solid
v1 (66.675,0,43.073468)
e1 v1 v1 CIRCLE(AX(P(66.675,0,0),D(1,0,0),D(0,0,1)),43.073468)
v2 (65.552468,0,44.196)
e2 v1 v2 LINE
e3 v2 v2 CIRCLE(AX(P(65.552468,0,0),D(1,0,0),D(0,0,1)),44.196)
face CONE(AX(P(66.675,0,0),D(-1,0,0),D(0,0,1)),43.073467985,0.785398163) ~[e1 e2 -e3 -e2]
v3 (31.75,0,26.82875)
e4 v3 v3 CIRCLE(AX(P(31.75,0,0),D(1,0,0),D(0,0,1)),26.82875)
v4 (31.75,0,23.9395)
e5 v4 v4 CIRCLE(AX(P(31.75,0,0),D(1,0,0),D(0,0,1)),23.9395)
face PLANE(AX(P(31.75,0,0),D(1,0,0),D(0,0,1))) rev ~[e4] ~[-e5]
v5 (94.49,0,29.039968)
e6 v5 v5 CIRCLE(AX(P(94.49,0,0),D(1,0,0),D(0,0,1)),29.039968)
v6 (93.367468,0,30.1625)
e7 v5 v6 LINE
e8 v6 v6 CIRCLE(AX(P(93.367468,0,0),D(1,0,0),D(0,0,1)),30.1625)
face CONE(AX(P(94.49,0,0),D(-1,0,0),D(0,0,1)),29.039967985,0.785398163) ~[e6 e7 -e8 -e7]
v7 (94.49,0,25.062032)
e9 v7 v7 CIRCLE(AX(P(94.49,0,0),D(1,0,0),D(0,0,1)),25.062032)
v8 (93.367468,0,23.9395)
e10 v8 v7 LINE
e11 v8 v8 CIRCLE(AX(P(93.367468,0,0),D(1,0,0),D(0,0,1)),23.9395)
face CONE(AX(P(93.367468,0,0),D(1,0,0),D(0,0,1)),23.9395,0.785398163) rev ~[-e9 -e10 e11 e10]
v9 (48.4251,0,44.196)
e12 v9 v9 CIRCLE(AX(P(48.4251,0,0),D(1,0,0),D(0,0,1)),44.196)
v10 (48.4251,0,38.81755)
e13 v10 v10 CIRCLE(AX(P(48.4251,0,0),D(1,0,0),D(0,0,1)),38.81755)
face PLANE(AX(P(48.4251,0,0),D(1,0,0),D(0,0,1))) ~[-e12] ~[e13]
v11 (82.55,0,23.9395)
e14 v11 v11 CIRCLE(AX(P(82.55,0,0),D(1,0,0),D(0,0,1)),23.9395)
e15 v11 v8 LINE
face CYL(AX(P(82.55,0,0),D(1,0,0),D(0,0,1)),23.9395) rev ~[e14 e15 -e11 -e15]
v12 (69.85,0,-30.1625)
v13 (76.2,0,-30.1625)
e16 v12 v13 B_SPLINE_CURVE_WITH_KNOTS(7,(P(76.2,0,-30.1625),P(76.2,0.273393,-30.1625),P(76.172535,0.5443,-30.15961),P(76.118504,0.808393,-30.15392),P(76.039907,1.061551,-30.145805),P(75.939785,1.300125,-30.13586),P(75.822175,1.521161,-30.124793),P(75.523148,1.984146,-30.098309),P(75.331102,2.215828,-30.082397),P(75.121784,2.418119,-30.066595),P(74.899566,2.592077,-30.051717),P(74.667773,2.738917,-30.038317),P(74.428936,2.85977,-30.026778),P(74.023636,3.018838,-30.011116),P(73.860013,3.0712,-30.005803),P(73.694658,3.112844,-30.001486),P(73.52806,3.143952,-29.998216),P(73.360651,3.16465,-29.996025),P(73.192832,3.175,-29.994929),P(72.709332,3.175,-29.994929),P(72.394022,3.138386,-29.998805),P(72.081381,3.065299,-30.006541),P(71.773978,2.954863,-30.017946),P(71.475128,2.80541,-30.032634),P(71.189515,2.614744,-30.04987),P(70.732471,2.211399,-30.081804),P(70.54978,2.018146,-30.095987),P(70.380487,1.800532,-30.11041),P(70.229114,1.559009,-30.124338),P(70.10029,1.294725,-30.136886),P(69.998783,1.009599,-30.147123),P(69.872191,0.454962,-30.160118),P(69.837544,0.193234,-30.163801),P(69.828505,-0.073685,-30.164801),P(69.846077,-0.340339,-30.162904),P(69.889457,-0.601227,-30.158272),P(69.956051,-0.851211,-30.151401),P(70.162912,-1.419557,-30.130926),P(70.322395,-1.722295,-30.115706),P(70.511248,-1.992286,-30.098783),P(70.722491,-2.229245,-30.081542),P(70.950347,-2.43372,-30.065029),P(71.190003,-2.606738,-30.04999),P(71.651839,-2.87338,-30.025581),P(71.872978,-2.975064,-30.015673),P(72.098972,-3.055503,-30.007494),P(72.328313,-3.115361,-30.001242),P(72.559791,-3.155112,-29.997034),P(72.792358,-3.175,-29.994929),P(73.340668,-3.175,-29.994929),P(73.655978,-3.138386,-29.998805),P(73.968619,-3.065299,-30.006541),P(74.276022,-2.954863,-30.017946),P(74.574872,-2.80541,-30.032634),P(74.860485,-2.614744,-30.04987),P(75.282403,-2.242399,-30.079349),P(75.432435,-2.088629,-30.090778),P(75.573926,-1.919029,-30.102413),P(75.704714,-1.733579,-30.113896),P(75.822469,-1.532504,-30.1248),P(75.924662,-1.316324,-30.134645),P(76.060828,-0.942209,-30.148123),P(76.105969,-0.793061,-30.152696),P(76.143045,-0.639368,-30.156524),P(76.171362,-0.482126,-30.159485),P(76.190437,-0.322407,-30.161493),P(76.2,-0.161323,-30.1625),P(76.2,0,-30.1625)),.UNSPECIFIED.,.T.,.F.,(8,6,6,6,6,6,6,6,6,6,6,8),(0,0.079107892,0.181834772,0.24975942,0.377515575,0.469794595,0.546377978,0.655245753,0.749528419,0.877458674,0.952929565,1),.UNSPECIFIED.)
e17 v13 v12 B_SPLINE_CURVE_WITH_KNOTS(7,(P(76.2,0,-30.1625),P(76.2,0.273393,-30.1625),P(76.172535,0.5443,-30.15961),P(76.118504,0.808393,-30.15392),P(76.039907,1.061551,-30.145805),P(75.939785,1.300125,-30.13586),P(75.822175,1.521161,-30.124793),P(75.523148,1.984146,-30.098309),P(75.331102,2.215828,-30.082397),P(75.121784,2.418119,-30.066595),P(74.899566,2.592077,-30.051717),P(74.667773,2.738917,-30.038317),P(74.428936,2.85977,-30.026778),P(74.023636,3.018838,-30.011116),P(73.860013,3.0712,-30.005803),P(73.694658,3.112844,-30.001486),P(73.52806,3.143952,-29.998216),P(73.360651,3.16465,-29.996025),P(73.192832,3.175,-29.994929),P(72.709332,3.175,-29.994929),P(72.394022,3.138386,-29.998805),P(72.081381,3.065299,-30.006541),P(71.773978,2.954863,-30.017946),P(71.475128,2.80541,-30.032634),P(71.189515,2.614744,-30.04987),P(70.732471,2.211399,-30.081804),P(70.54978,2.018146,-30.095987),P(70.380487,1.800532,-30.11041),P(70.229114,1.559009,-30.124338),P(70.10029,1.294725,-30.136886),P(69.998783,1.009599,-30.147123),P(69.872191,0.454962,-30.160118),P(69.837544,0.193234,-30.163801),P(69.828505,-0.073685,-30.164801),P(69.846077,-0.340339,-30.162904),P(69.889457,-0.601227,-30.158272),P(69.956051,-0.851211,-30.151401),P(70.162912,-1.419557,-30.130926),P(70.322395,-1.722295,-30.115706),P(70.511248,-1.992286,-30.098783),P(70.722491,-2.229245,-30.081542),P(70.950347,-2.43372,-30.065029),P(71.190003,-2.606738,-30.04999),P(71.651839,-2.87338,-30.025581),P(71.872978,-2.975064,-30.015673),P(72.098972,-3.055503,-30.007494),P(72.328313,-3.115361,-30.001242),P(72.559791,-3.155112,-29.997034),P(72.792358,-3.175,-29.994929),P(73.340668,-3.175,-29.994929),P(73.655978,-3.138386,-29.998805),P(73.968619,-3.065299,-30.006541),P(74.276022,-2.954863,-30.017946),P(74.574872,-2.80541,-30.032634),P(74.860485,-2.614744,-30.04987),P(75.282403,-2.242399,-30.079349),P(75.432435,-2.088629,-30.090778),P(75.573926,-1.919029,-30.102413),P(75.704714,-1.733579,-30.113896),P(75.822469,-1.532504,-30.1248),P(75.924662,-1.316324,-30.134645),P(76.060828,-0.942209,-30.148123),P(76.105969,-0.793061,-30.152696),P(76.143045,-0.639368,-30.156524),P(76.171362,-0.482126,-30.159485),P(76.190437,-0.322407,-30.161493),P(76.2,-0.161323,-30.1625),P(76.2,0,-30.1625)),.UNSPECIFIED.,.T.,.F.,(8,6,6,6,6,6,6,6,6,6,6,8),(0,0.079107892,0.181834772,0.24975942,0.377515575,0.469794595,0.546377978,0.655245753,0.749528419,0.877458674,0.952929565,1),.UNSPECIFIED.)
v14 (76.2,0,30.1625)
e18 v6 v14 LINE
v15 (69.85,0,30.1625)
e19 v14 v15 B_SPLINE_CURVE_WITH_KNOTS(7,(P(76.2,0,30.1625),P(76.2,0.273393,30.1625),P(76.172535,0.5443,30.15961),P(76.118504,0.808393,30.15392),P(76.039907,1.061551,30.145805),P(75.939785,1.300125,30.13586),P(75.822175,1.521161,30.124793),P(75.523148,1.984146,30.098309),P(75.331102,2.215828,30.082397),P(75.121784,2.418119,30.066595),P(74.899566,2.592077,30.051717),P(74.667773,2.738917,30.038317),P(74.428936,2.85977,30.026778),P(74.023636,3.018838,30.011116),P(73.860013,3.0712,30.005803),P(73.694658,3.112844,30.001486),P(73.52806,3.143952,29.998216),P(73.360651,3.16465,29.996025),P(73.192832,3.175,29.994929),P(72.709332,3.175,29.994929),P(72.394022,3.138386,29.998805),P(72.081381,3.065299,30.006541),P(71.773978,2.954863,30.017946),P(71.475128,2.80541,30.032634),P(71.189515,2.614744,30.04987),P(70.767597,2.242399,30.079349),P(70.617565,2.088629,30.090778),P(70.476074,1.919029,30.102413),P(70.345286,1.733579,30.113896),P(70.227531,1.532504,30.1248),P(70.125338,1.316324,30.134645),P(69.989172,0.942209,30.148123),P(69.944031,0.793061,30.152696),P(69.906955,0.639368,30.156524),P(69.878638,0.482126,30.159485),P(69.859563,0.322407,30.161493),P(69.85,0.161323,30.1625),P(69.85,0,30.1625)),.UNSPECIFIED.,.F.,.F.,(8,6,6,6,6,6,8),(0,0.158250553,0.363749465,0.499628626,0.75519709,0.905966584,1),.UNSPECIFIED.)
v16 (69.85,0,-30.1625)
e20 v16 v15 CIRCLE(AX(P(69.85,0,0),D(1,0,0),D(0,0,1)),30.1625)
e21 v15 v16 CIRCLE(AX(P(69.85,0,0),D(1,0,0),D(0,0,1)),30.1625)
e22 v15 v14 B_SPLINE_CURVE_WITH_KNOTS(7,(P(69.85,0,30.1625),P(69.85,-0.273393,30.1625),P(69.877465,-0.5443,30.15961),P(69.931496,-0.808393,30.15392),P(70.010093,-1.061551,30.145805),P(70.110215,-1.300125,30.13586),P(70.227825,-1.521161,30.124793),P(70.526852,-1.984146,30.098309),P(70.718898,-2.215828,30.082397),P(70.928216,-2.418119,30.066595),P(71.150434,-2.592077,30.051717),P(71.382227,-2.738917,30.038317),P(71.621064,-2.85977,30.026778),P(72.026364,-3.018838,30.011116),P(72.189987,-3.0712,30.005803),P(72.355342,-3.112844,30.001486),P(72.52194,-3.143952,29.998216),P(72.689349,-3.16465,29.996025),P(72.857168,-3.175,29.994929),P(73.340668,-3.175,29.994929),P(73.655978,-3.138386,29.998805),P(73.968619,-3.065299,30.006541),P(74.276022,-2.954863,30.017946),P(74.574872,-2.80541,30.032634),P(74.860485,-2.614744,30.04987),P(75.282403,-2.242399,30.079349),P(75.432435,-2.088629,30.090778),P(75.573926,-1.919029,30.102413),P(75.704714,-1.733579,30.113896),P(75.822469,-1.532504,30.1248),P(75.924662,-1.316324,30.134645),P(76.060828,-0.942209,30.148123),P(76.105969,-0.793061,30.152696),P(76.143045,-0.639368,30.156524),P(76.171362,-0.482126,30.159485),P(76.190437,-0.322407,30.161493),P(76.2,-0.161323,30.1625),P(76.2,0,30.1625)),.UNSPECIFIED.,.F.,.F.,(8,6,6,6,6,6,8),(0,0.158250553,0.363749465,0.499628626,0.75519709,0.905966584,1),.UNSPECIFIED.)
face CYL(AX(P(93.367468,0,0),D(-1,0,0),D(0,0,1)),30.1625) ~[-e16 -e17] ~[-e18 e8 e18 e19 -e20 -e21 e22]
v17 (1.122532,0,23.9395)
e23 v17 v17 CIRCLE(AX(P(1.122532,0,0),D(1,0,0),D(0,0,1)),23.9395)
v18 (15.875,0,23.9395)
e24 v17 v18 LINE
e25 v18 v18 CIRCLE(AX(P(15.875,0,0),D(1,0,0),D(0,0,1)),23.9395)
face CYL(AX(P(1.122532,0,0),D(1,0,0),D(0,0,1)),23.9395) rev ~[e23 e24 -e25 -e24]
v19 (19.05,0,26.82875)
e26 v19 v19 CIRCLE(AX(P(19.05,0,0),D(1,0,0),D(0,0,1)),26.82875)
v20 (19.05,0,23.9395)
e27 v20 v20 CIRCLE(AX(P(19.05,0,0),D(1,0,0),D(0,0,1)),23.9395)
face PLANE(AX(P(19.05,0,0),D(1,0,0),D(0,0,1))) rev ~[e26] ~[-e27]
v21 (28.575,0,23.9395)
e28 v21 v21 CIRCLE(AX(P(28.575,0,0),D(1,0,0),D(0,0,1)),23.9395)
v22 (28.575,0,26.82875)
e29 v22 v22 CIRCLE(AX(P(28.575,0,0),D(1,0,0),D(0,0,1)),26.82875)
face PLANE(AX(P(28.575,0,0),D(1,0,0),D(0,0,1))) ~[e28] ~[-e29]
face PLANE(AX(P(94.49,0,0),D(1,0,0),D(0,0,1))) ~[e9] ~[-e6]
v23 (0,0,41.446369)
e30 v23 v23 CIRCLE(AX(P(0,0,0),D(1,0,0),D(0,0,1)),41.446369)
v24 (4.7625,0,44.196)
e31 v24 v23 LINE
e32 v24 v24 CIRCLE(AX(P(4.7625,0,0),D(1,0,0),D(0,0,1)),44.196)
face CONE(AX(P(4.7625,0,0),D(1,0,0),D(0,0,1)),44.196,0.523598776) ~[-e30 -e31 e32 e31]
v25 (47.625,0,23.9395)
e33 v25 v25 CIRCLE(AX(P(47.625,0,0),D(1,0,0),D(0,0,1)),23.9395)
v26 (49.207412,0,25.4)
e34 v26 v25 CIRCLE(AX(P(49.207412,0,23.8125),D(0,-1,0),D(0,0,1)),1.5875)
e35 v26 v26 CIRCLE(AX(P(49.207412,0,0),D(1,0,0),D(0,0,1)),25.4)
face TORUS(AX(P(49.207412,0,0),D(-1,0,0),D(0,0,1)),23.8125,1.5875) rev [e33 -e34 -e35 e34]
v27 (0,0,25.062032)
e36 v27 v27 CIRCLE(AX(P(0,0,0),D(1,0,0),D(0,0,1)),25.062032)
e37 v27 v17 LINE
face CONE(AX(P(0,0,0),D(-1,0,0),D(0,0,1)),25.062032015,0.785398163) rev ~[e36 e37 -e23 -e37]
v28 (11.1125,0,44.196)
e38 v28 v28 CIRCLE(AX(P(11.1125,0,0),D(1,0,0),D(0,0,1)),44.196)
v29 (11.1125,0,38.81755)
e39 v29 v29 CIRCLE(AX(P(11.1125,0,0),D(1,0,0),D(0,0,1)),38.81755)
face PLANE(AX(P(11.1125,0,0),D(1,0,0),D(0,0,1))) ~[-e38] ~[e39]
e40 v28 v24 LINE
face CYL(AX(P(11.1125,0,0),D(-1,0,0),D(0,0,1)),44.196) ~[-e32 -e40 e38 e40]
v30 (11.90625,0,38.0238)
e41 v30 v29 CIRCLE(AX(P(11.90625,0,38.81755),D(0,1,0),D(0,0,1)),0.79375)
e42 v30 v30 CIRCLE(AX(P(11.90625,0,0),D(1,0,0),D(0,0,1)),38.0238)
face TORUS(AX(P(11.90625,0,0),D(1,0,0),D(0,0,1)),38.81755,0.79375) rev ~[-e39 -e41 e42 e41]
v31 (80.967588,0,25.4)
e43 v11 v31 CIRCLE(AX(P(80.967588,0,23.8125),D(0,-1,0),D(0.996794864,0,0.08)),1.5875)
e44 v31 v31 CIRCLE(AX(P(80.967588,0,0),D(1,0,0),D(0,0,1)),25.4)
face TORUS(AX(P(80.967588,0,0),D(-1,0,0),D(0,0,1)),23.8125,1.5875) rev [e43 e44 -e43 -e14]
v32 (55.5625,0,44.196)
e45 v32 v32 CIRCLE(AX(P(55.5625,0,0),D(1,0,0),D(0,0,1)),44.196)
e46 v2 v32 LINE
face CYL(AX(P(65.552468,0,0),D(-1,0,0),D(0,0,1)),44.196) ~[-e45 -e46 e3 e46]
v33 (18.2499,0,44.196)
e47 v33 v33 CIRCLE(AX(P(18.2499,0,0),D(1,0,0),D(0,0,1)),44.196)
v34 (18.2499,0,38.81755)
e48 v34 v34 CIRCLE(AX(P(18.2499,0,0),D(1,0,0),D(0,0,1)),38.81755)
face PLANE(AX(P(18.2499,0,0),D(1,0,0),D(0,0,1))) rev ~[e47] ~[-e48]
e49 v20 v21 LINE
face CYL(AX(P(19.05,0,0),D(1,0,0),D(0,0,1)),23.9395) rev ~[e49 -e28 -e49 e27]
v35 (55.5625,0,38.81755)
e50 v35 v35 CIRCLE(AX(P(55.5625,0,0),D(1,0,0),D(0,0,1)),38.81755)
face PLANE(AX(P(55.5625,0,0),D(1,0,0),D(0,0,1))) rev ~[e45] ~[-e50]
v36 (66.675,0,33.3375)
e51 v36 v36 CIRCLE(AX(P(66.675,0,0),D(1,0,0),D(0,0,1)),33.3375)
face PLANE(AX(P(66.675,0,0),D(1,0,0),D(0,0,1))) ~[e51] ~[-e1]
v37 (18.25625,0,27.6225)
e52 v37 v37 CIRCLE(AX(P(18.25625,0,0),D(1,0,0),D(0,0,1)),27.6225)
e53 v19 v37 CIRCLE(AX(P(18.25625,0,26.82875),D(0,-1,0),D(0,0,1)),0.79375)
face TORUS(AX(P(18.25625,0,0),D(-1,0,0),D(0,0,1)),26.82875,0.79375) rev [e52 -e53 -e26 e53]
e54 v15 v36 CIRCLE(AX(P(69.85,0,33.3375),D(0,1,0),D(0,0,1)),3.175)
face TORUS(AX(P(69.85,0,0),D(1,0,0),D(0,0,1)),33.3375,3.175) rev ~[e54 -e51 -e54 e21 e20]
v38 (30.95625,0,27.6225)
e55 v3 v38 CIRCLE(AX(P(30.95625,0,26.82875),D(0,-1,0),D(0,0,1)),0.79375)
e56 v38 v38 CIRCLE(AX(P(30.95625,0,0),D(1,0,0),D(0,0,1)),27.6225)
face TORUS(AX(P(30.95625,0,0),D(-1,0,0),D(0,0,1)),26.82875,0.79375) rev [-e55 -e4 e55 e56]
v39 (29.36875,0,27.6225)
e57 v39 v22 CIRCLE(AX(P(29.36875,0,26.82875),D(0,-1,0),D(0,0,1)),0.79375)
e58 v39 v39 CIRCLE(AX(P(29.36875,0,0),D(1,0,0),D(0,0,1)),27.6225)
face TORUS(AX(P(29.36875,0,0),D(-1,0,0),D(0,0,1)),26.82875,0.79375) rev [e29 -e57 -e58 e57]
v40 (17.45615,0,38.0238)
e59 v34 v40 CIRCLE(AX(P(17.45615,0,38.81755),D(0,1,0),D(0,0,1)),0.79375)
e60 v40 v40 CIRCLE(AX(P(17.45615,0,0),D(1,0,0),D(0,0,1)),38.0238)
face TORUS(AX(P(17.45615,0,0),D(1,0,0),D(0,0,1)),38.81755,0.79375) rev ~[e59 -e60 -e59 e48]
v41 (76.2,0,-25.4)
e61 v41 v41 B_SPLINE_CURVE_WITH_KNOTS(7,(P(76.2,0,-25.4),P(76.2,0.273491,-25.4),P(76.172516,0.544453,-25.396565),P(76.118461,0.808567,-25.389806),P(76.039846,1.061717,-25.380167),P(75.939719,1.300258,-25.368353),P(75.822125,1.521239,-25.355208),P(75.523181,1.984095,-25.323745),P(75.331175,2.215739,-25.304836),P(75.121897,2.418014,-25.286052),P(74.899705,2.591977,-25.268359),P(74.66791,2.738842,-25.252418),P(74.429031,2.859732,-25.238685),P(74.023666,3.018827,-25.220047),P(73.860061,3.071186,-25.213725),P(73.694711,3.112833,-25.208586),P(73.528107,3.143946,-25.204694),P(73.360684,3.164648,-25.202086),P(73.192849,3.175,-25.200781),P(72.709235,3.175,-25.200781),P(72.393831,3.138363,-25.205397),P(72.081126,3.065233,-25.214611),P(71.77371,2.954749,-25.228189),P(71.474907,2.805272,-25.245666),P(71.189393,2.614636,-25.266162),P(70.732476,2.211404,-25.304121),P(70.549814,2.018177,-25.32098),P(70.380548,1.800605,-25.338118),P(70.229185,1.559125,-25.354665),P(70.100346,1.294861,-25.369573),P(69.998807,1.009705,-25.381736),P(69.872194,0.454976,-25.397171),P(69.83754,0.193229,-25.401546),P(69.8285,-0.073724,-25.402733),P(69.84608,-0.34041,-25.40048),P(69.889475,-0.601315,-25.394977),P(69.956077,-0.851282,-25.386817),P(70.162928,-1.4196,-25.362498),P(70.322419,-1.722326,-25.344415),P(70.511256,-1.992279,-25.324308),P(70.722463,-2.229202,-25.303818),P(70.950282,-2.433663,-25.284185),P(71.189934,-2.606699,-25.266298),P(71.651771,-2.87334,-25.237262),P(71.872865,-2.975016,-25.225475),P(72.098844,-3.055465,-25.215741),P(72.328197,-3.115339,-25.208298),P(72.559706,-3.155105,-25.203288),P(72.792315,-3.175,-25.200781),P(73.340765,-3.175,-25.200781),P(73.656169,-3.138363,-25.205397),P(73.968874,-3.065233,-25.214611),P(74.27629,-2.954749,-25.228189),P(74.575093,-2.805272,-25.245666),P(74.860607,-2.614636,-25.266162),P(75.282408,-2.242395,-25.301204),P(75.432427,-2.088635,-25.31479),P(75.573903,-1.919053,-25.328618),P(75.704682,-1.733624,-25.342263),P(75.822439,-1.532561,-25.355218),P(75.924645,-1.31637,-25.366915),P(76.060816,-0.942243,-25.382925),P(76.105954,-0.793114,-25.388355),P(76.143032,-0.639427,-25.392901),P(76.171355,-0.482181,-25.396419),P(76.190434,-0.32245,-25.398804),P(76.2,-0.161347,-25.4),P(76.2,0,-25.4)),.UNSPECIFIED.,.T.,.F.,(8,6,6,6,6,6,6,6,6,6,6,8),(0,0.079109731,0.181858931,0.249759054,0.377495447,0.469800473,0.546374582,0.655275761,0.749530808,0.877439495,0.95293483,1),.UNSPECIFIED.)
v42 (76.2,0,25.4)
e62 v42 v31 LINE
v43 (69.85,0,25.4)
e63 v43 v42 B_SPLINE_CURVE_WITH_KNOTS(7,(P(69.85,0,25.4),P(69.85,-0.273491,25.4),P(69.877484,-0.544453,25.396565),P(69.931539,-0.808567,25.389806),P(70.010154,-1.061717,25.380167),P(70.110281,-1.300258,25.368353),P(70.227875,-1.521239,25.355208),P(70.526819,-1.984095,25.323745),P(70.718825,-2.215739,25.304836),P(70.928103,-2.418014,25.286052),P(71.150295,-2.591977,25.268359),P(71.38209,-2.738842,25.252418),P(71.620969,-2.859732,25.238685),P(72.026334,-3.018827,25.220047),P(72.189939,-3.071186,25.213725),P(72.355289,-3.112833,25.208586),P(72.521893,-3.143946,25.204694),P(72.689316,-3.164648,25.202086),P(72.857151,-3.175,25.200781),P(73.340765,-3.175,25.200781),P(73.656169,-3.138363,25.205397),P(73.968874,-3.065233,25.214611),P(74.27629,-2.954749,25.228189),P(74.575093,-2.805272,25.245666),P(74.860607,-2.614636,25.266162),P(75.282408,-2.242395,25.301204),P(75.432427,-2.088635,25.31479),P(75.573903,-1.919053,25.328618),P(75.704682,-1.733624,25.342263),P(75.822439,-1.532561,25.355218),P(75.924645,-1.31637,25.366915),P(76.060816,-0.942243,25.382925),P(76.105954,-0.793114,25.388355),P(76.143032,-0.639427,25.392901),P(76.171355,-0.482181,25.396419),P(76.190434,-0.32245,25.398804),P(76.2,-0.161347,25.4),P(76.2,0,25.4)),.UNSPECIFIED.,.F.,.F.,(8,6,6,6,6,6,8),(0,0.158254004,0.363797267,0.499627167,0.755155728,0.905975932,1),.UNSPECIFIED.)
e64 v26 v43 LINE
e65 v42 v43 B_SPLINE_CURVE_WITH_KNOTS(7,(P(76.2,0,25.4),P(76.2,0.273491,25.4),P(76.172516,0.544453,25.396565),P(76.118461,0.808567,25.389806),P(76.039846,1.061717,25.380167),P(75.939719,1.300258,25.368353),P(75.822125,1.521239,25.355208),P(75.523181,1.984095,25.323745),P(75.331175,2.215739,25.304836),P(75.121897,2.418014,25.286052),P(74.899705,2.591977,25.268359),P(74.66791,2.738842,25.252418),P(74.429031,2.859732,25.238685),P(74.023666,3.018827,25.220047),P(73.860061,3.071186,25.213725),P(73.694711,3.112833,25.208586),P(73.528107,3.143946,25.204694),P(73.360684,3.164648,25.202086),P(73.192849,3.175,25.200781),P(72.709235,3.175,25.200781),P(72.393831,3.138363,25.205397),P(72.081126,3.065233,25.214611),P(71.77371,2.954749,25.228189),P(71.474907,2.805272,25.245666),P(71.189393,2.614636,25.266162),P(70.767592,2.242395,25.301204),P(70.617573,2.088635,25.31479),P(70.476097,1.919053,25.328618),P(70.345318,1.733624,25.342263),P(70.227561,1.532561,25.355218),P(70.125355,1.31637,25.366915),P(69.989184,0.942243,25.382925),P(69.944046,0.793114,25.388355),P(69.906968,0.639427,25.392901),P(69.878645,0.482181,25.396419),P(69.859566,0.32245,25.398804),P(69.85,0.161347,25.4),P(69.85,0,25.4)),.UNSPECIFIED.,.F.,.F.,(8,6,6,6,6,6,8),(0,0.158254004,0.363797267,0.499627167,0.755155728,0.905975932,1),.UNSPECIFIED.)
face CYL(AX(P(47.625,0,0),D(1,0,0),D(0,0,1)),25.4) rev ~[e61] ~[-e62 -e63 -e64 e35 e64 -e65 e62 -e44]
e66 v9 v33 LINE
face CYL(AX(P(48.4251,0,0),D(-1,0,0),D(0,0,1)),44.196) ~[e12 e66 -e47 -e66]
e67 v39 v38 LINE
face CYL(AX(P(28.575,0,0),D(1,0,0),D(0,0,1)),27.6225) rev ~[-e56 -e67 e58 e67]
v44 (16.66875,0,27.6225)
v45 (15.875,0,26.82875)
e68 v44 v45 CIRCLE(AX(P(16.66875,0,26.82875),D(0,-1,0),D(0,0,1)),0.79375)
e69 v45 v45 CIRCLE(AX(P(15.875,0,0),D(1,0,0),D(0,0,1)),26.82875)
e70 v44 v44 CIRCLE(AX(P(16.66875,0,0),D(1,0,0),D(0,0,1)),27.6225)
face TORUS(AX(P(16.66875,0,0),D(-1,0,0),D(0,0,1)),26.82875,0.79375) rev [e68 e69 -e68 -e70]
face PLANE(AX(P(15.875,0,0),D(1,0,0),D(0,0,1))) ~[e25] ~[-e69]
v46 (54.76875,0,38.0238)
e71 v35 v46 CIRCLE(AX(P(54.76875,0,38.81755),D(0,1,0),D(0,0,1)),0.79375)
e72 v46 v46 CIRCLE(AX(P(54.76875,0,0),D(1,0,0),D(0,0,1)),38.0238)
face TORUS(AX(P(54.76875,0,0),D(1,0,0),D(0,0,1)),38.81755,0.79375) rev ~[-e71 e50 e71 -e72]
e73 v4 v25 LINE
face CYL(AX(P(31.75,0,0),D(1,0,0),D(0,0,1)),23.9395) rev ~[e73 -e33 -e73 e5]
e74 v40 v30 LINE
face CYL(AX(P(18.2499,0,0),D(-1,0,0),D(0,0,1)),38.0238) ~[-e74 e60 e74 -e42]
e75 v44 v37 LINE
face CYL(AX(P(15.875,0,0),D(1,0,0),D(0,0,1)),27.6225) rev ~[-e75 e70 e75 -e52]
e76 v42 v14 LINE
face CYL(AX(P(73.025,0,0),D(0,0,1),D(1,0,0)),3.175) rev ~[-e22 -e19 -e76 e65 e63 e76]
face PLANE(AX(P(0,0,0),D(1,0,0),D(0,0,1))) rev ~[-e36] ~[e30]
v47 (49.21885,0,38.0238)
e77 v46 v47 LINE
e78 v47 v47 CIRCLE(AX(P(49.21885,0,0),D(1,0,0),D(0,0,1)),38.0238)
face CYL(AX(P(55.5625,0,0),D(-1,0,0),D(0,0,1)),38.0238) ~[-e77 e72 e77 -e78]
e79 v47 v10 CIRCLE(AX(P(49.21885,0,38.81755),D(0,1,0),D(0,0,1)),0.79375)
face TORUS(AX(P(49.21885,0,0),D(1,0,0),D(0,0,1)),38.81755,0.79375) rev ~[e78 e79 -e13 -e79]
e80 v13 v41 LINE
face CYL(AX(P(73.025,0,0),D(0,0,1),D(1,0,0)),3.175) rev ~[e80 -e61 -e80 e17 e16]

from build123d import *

# Parameters (mm, degrees)
F2_R     = 3.175
F4_R     = 0.79375
F5_R     = 3.175
F6_DEPTH = 50.8


# Not quite as in the source:
# - a fillet or chamfer that OpenCascade refuses, or shapes differently, is made with other operations: its cross-section is extruded or revolved along the edge and cut away or added


with BuildPart() as f1:
    # F0 (on Front) → F1 (revolve)
    with BuildSketch(Plane.XZ):
        Polygon((0, 25.0620320151), (1.1225320151, 23.9395), (15.875, 23.9395), (15.875, 27.6225), (19.05, 27.6225), (19.05, 23.9395), (28.575, 23.9395), (28.575, 27.6225), (31.75, 27.6225), (31.75, 23.9395), (47.625, 23.9395), (47.625, 25.4), (82.55, 25.4), (82.55, 23.9395), (93.3674679849, 23.9395), (94.49, 25.0620320151), (94.49, 29.0399679849), (93.3674679849, 30.1625), (66.675, 30.1625), (66.675, 43.0734679849), (65.5524679849, 44.196), (55.5625, 44.196), (55.5625, 38.0238), (48.4251, 38.0238), (48.4251, 44.196), (18.2499, 44.196), (18.2499, 38.0238), (11.1125, 38.0238), (11.1125, 44.196), (4.7625, 44.196), (0, 41.446369343), align=None)
    revolve(axis=Axis((55.6648539445, 0, 0), (1, 0, 0)))

    # F2
    f2_edges = [f1.edges().sort_by_distance(p)[0] for p in [
        (66.675, 0, -30.1625),
    ]]
    fillet(f2_edges, radius=F2_R)

    # F3: fillet of radius 1.5875 on 2 edges, made by hand

    # F3_s1 → F3_t2 (revolve)
    with BuildSketch(Plane.XZ):
        with BuildLine():
            ThreePointArc((49.2074118459, 25.4), (48.1307169611, 24.97906949), (47.625, 23.9395))
            Line((47.625, 23.9395), (47.625, 25.4))
            Line((47.625, 25.4), (49.2074118459, 25.4))
        make_face()
    revolve(axis=Axis((47.625, 0, 0), (1, 0, 0)))

    # F3_s3 → F3_t4 (revolve)
    with BuildSketch(Plane.XZ):
        with BuildLine():
            ThreePointArc((82.55, 23.9395), (82.0442830389, 24.97906949), (80.9675881541, 25.4))
            Line((80.9675881541, 25.4), (82.55, 25.4))
            Line((82.55, 25.4), (82.55, 23.9395))
        make_face()
    revolve(axis=Axis((82.55, 0, 0), (1, 0, 0)))

    # F4
    f4_edges = [f1.edges().sort_by_distance(p)[0] for p in [
        (18.2499, 0, -38.0238),
        (55.5625, 0, -38.0238),
        (19.05, 0, -27.6225),
        (31.75, 0, -27.6225),
        (15.875, 0, -27.6225),
        (28.575, 0, -27.6225),
        (11.1125, 0, -38.0238),
        (48.4251, 0, -38.0238),
    ]]
    fillet(f4_edges, radius=F4_R)

    # F5 (on Top) → F6 (cut, symmetric)
    with BuildSketch(Plane.XY):
        with Locations((73.025, 0)):
            Circle(F5_R)
    extrude(amount=F6_DEPTH, both=True, mode=Mode.SUBTRACT)


solid = f1.part
